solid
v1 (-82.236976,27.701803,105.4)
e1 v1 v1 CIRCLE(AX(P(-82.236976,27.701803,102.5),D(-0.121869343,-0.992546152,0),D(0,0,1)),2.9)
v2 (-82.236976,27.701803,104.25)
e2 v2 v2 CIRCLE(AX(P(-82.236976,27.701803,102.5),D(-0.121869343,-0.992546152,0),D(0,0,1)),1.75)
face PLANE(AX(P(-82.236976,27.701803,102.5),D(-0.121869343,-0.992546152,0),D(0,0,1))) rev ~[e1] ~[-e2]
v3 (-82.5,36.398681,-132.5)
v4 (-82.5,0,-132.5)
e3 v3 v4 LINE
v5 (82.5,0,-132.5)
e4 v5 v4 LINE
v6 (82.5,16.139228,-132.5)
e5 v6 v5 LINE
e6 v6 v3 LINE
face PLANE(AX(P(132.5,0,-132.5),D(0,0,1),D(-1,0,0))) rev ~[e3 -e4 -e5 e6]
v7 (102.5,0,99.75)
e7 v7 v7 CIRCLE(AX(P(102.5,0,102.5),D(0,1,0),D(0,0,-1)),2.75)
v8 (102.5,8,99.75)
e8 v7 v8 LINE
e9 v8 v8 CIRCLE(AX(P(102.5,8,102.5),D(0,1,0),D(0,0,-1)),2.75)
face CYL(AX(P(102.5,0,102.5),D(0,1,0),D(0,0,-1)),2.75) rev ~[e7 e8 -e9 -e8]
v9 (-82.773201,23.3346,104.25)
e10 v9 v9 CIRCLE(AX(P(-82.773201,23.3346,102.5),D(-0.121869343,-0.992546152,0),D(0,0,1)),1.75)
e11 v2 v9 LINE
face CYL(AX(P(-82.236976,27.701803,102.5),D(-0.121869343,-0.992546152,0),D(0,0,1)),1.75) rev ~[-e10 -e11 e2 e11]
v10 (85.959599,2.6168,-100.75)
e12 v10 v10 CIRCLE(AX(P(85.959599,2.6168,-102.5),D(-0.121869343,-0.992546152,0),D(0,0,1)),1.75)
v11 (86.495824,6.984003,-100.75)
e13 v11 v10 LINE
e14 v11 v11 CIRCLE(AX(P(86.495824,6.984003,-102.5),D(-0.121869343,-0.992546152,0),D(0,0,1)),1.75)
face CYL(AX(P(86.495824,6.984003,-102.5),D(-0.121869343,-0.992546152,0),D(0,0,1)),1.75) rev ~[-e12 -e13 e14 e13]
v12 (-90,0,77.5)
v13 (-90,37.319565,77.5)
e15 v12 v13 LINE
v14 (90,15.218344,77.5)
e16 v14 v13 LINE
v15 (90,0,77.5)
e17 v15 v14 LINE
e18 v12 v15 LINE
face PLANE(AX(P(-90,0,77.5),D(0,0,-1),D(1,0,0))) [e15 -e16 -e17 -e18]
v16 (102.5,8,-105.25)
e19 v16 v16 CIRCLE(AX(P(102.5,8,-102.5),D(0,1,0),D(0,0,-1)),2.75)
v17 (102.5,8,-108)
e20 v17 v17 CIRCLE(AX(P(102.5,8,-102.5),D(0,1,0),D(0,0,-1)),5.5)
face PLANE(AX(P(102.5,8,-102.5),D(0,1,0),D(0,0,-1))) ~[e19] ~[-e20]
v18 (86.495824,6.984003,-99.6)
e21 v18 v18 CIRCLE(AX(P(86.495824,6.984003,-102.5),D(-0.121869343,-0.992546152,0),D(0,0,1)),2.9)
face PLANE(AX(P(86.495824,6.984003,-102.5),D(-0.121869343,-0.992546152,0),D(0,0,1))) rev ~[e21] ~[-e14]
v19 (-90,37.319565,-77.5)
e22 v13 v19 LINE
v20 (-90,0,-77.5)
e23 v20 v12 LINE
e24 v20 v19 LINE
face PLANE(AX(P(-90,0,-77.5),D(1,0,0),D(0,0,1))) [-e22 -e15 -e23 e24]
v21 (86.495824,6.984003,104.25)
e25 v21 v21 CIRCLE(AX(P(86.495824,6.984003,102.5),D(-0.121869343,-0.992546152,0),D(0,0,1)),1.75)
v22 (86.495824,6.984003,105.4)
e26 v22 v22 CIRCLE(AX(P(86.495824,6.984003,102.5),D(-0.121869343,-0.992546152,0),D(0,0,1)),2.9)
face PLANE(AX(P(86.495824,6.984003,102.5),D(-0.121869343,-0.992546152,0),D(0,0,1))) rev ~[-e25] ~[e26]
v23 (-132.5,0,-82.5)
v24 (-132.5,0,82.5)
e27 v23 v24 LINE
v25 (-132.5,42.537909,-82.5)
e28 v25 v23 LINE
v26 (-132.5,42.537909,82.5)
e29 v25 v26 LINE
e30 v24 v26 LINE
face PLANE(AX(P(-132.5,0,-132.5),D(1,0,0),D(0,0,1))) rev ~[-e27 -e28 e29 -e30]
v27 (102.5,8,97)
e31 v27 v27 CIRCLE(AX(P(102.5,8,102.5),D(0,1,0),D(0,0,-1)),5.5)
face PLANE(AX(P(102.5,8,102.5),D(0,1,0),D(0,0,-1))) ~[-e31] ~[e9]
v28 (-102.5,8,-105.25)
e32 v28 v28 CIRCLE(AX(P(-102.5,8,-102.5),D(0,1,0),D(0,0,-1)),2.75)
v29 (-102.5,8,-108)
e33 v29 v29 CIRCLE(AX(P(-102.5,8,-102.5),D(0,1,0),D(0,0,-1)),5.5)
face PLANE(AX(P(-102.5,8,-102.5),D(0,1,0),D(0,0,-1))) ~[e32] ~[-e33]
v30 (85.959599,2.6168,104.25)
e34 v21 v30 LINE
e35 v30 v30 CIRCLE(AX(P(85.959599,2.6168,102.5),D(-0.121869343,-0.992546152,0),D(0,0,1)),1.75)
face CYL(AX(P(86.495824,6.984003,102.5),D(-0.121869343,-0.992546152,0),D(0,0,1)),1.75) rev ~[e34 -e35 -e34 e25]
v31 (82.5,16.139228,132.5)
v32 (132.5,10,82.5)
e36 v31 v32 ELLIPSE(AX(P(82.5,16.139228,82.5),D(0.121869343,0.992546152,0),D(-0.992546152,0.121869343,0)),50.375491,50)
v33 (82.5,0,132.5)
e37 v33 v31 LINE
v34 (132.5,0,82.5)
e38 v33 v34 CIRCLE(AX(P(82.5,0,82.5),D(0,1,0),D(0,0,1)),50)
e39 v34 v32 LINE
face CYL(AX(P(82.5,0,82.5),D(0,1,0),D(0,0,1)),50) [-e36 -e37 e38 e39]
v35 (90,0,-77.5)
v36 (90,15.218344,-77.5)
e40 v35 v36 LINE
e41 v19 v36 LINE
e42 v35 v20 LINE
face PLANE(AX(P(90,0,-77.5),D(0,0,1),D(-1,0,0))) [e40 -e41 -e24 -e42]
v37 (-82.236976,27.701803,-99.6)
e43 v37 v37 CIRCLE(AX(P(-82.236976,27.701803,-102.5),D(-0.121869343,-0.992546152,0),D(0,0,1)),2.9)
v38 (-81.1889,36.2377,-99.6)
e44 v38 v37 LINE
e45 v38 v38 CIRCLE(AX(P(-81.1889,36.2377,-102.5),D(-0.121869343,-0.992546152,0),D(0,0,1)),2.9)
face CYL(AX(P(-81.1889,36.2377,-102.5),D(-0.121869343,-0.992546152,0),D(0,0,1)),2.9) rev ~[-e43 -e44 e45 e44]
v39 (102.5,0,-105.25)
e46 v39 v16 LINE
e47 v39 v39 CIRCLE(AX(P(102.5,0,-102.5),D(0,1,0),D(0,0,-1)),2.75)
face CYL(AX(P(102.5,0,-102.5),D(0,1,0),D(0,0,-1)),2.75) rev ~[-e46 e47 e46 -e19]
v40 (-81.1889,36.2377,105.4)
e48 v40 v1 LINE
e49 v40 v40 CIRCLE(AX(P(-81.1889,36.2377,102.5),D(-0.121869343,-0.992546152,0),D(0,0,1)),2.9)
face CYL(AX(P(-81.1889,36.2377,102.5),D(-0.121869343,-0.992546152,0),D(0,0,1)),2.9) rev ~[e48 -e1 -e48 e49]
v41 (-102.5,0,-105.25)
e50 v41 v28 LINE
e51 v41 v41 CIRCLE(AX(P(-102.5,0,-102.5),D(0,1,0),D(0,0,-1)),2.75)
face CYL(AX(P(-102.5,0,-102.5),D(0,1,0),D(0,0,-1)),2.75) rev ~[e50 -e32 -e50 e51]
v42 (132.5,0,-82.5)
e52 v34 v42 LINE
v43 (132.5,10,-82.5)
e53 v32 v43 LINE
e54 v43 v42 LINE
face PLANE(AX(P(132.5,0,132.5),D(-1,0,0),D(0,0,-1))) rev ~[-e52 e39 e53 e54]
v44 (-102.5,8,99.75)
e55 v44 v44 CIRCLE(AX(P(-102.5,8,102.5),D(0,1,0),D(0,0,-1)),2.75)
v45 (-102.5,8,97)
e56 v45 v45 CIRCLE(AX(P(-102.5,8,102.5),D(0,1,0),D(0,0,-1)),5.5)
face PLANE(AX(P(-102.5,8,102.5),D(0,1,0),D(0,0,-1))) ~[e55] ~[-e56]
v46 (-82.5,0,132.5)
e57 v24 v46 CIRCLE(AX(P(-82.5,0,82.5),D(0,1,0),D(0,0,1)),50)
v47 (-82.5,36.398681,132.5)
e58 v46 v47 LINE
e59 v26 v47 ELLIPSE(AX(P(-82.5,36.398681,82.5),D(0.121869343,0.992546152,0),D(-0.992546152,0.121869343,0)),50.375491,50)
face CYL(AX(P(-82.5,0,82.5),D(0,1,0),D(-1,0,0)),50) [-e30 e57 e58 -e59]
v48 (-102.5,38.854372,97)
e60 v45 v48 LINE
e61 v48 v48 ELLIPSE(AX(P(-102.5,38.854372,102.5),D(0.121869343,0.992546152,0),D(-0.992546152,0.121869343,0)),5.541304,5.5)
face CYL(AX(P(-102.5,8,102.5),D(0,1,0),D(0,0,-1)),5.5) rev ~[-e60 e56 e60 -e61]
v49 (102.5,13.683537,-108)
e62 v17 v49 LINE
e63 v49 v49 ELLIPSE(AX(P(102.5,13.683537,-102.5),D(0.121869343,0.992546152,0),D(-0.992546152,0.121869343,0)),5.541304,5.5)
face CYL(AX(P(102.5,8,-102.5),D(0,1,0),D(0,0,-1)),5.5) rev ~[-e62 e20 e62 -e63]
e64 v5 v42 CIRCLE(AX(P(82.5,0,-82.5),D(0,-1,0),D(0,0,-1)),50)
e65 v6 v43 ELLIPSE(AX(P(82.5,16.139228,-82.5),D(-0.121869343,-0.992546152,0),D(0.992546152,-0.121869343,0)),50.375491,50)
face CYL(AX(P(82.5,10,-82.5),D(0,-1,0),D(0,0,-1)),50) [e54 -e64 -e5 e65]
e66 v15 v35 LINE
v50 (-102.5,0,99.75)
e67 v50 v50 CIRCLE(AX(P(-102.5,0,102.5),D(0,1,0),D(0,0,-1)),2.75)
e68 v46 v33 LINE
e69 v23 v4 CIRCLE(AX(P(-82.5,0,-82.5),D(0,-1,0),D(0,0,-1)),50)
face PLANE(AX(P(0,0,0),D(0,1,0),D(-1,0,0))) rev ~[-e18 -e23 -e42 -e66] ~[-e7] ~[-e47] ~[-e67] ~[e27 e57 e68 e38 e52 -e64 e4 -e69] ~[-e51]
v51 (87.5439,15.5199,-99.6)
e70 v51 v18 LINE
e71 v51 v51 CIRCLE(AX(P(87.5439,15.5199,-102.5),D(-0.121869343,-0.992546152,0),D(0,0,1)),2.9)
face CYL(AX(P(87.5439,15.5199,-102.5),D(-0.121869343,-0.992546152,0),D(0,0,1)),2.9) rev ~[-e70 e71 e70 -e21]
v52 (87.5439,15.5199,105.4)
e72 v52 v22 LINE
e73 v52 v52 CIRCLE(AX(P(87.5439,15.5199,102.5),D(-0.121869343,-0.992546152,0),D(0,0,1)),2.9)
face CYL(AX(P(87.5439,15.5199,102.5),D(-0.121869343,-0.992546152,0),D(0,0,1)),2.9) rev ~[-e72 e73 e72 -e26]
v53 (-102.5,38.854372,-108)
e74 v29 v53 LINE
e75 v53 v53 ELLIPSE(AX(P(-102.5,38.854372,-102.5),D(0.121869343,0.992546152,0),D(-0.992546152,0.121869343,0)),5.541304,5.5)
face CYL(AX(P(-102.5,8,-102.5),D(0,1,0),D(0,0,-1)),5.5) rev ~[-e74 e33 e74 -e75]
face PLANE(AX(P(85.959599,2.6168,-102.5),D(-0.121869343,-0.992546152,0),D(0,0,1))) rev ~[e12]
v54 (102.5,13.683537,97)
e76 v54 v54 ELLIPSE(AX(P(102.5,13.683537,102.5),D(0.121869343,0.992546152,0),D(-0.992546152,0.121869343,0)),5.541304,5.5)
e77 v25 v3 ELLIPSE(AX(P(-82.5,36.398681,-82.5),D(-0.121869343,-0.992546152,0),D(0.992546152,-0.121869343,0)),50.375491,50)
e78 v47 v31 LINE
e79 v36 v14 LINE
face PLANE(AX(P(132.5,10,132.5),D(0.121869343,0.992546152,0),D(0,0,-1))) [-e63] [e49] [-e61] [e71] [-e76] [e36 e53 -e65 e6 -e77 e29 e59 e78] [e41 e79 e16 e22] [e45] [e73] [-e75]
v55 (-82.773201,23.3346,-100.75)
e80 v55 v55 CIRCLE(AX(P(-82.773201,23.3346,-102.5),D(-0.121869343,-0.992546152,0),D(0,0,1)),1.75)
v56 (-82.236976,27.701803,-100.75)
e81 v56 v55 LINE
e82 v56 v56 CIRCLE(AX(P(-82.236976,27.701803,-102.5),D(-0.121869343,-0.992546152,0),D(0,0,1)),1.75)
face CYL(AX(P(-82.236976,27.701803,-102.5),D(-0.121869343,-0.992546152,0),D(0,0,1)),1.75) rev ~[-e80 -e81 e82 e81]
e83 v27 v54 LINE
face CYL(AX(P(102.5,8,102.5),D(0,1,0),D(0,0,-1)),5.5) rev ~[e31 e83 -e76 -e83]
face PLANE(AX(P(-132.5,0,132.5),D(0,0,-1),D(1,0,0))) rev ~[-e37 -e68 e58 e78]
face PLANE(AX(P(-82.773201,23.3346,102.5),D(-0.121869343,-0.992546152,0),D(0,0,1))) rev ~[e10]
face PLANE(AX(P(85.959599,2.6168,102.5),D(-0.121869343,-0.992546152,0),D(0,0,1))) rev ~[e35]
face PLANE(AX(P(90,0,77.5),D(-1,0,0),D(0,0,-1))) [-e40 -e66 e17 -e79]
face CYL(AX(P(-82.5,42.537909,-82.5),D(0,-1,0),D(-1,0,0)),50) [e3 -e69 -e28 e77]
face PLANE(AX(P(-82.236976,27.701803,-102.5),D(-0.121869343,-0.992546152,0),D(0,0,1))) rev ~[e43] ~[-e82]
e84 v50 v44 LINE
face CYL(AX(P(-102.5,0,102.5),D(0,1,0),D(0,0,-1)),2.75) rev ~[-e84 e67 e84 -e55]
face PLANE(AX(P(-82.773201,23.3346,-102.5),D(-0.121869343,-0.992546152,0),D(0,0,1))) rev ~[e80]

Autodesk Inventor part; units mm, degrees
ref_plane "YZ Plane" through (0, 0, 0) normal (1, 0, 0) x (0, 1, 0)
ref_plane "XZ Plane" through (0, 0, 0) normal (0, 1, 0) x (-1, 0, 0)
sketch "草圖1" plane through (0, 0, 0) normal (0, 1, 0) x (-1, 0, 0)
  line L0 (132.5, 132.5) -> (-132.5, 132.5)
  line L1 (-132.5, 132.5) -> (-132.5, -132.5)
  line L2 (-132.5, -132.5) -> (132.5, -132.5)
  line L3 (132.5, -132.5) -> (132.5, 132.5)
  line L4 (132.5, 132.5) -> (-132.5, -132.5) construction
  line L5 (-132.5, 132.5) -> (132.5, -132.5) construction
  point P0 (0, 0)
  dimension "d0" = 265
  dimension "d1" = 265
extrude "擠出1" add sketch "草圖1" along normal blind 10
sketch "草圖3" plane through (0, 10, 0) normal (0, 1, 0) x (1, 0, 0)
  line L0 (132.5, -132.5) -> (132.5, 132.5) projected
  line L1 (132.5, 132.5) -> (-132.5, 132.5) projected
  line L2 (-132.5, 132.5) -> (-132.5, -132.5) projected
  line L3 (-132.5, -132.5) -> (132.5, -132.5) projected
  point P0 (0, 0)
extrude "擠出2" add sketch "草圖3" along normal blind 100
sketch "草圖4" plane through (132.5, 0, 132.5) normal (1, 0, 0) x (0, 0, -1)
  line L0 (0, 0) -> (265, 0) projected
  line L1 (265, 0) -> (265, 110) projected
  line L2 (0, 110) -> (265, 110) projected
  line L3 (0, 0) -> (0, 110) projected
  line L4 (0, 0) -> (0, 110) projected
  line L5 (0, 10) -> (265, 10)
  point P0 (132.5, 0)
  dimension "d7" = 10
ref_plane "工作平面2" through (132.5, 10, 132.5) normal (0.1218693, 0.9925462, 0) x (0, 0, -1)
split "分割1" plane through (132.5, 10, 132.5) removes the side toward (0.1218693, 0.9925462, 0)
sketch "草圖5" plane through (0, 0, 0) normal (0, -1, 0) x (1, 0, 0)
  line L0 (-102.5, -102.5) -> (102.5, -102.5) construction
  line L1 (102.5, -102.5) -> (102.5, 102.5) construction
  line L2 (102.5, 102.5) -> (-102.5, 102.5) construction
  line L3 (-102.5, 102.5) -> (-102.5, -102.5) construction
  line L4 (-102.5, -102.5) -> (102.5, 102.5) construction
  line L5 (102.5, -102.5) -> (-102.5, 102.5) construction
  point P0 (0, 0)
  dimension "d9" = 205
  dimension "d10" = 205
hole "孔1" at (-102.5, 0, -102.5) at (102.5, 0, -102.5) at (102.5, 0, 102.5) at (-102.5, 0, 102.5) direction (0, 1, 0) diameter 5.5 depth 8
sketch "草圖6" plane through (-102.5, 8, -102.5) normal (0, -1, 0) x (1, 0, 0)
  circle A0 centre (0, 205) radius 2.75 projected
  circle A1 centre (205, 205) radius 2.75 projected
  circle A2 centre (205, 0) radius 2.75 projected
  circle A3 centre (0, 0) radius 2.75 projected
  circle A4 centre (0, 0) radius 2.75 projected
  circle A5 centre (205, 0) radius 2.75 projected
  circle A6 centre (0, 205) radius 2.75 projected
  point P0 (102.5, 102.5)
hole "孔2" at (-102.5, 8, -102.5) at (102.5, 8, -102.5) at (102.5, 8, 102.5) at (-102.5, 8, 102.5) direction (0, 1, 0) diameter 11 end through all
sketch "草圖7" plane through (132.5, 10, 132.5) normal (0.1218693, 0.9925462, 0) x (0.9925462, -0.1218693, 0)
  line L0 (-215.2937, 30) -> (-45.2937, 30)
  line L1 (-45.2937, 30) -> (-45.2937, 235)
  line L2 (-45.2937, 235) -> (-215.2937, 235)
  line L3 (-215.2937, 235) -> (-215.2937, 30)
  line L4 (-215.2937, 30) -> (-45.2937, 235) construction
  line L5 (-45.2937, 30) -> (-215.2937, 235) construction
  point P0 (-130.2937, 132.5)
  dimension "d25" = 170
  dimension "d26" = 205
hole "孔3" at (-81.1889, 36.2377, 102.5) at (87.5439, 15.5199, 102.5) at (87.5439, 15.5199, -102.5) at (-81.1889, 36.2377, -102.5) direction (-0.1218693, -0.9925462, 0) diameter 3.5 depth 13 counterbore diameter 5.8 counterbore depth 8.6
sketch "草圖8" plane through (0, 0, 0) normal (0, -1, 0) x (1, 0, 0)
  line L0 (-90, 77.5) -> (90, 77.5)
  line L1 (90, 77.5) -> (90, -77.5)
  line L2 (90, -77.5) -> (-90, -77.5)
  line L3 (-90, -77.5) -> (-90, 77.5)
  line L4 (-90, 77.5) -> (90, -77.5) construction
  line L5 (90, 77.5) -> (-90, -77.5) construction
  point P0 (0, 0)
  dimension "d34" = 180
  dimension "d35" = 155
extrude "擠出3" cut sketch "草圖8" against normal through all
fillet "圓角1" radius 50 4 edges at (-132.5, 21.269, 132.5) (-132.5, 21.269, -132.5) (132.5, 5, -132.5) (132.5, 5, 132.5)
properties part number "頸部桌面轉接件"
